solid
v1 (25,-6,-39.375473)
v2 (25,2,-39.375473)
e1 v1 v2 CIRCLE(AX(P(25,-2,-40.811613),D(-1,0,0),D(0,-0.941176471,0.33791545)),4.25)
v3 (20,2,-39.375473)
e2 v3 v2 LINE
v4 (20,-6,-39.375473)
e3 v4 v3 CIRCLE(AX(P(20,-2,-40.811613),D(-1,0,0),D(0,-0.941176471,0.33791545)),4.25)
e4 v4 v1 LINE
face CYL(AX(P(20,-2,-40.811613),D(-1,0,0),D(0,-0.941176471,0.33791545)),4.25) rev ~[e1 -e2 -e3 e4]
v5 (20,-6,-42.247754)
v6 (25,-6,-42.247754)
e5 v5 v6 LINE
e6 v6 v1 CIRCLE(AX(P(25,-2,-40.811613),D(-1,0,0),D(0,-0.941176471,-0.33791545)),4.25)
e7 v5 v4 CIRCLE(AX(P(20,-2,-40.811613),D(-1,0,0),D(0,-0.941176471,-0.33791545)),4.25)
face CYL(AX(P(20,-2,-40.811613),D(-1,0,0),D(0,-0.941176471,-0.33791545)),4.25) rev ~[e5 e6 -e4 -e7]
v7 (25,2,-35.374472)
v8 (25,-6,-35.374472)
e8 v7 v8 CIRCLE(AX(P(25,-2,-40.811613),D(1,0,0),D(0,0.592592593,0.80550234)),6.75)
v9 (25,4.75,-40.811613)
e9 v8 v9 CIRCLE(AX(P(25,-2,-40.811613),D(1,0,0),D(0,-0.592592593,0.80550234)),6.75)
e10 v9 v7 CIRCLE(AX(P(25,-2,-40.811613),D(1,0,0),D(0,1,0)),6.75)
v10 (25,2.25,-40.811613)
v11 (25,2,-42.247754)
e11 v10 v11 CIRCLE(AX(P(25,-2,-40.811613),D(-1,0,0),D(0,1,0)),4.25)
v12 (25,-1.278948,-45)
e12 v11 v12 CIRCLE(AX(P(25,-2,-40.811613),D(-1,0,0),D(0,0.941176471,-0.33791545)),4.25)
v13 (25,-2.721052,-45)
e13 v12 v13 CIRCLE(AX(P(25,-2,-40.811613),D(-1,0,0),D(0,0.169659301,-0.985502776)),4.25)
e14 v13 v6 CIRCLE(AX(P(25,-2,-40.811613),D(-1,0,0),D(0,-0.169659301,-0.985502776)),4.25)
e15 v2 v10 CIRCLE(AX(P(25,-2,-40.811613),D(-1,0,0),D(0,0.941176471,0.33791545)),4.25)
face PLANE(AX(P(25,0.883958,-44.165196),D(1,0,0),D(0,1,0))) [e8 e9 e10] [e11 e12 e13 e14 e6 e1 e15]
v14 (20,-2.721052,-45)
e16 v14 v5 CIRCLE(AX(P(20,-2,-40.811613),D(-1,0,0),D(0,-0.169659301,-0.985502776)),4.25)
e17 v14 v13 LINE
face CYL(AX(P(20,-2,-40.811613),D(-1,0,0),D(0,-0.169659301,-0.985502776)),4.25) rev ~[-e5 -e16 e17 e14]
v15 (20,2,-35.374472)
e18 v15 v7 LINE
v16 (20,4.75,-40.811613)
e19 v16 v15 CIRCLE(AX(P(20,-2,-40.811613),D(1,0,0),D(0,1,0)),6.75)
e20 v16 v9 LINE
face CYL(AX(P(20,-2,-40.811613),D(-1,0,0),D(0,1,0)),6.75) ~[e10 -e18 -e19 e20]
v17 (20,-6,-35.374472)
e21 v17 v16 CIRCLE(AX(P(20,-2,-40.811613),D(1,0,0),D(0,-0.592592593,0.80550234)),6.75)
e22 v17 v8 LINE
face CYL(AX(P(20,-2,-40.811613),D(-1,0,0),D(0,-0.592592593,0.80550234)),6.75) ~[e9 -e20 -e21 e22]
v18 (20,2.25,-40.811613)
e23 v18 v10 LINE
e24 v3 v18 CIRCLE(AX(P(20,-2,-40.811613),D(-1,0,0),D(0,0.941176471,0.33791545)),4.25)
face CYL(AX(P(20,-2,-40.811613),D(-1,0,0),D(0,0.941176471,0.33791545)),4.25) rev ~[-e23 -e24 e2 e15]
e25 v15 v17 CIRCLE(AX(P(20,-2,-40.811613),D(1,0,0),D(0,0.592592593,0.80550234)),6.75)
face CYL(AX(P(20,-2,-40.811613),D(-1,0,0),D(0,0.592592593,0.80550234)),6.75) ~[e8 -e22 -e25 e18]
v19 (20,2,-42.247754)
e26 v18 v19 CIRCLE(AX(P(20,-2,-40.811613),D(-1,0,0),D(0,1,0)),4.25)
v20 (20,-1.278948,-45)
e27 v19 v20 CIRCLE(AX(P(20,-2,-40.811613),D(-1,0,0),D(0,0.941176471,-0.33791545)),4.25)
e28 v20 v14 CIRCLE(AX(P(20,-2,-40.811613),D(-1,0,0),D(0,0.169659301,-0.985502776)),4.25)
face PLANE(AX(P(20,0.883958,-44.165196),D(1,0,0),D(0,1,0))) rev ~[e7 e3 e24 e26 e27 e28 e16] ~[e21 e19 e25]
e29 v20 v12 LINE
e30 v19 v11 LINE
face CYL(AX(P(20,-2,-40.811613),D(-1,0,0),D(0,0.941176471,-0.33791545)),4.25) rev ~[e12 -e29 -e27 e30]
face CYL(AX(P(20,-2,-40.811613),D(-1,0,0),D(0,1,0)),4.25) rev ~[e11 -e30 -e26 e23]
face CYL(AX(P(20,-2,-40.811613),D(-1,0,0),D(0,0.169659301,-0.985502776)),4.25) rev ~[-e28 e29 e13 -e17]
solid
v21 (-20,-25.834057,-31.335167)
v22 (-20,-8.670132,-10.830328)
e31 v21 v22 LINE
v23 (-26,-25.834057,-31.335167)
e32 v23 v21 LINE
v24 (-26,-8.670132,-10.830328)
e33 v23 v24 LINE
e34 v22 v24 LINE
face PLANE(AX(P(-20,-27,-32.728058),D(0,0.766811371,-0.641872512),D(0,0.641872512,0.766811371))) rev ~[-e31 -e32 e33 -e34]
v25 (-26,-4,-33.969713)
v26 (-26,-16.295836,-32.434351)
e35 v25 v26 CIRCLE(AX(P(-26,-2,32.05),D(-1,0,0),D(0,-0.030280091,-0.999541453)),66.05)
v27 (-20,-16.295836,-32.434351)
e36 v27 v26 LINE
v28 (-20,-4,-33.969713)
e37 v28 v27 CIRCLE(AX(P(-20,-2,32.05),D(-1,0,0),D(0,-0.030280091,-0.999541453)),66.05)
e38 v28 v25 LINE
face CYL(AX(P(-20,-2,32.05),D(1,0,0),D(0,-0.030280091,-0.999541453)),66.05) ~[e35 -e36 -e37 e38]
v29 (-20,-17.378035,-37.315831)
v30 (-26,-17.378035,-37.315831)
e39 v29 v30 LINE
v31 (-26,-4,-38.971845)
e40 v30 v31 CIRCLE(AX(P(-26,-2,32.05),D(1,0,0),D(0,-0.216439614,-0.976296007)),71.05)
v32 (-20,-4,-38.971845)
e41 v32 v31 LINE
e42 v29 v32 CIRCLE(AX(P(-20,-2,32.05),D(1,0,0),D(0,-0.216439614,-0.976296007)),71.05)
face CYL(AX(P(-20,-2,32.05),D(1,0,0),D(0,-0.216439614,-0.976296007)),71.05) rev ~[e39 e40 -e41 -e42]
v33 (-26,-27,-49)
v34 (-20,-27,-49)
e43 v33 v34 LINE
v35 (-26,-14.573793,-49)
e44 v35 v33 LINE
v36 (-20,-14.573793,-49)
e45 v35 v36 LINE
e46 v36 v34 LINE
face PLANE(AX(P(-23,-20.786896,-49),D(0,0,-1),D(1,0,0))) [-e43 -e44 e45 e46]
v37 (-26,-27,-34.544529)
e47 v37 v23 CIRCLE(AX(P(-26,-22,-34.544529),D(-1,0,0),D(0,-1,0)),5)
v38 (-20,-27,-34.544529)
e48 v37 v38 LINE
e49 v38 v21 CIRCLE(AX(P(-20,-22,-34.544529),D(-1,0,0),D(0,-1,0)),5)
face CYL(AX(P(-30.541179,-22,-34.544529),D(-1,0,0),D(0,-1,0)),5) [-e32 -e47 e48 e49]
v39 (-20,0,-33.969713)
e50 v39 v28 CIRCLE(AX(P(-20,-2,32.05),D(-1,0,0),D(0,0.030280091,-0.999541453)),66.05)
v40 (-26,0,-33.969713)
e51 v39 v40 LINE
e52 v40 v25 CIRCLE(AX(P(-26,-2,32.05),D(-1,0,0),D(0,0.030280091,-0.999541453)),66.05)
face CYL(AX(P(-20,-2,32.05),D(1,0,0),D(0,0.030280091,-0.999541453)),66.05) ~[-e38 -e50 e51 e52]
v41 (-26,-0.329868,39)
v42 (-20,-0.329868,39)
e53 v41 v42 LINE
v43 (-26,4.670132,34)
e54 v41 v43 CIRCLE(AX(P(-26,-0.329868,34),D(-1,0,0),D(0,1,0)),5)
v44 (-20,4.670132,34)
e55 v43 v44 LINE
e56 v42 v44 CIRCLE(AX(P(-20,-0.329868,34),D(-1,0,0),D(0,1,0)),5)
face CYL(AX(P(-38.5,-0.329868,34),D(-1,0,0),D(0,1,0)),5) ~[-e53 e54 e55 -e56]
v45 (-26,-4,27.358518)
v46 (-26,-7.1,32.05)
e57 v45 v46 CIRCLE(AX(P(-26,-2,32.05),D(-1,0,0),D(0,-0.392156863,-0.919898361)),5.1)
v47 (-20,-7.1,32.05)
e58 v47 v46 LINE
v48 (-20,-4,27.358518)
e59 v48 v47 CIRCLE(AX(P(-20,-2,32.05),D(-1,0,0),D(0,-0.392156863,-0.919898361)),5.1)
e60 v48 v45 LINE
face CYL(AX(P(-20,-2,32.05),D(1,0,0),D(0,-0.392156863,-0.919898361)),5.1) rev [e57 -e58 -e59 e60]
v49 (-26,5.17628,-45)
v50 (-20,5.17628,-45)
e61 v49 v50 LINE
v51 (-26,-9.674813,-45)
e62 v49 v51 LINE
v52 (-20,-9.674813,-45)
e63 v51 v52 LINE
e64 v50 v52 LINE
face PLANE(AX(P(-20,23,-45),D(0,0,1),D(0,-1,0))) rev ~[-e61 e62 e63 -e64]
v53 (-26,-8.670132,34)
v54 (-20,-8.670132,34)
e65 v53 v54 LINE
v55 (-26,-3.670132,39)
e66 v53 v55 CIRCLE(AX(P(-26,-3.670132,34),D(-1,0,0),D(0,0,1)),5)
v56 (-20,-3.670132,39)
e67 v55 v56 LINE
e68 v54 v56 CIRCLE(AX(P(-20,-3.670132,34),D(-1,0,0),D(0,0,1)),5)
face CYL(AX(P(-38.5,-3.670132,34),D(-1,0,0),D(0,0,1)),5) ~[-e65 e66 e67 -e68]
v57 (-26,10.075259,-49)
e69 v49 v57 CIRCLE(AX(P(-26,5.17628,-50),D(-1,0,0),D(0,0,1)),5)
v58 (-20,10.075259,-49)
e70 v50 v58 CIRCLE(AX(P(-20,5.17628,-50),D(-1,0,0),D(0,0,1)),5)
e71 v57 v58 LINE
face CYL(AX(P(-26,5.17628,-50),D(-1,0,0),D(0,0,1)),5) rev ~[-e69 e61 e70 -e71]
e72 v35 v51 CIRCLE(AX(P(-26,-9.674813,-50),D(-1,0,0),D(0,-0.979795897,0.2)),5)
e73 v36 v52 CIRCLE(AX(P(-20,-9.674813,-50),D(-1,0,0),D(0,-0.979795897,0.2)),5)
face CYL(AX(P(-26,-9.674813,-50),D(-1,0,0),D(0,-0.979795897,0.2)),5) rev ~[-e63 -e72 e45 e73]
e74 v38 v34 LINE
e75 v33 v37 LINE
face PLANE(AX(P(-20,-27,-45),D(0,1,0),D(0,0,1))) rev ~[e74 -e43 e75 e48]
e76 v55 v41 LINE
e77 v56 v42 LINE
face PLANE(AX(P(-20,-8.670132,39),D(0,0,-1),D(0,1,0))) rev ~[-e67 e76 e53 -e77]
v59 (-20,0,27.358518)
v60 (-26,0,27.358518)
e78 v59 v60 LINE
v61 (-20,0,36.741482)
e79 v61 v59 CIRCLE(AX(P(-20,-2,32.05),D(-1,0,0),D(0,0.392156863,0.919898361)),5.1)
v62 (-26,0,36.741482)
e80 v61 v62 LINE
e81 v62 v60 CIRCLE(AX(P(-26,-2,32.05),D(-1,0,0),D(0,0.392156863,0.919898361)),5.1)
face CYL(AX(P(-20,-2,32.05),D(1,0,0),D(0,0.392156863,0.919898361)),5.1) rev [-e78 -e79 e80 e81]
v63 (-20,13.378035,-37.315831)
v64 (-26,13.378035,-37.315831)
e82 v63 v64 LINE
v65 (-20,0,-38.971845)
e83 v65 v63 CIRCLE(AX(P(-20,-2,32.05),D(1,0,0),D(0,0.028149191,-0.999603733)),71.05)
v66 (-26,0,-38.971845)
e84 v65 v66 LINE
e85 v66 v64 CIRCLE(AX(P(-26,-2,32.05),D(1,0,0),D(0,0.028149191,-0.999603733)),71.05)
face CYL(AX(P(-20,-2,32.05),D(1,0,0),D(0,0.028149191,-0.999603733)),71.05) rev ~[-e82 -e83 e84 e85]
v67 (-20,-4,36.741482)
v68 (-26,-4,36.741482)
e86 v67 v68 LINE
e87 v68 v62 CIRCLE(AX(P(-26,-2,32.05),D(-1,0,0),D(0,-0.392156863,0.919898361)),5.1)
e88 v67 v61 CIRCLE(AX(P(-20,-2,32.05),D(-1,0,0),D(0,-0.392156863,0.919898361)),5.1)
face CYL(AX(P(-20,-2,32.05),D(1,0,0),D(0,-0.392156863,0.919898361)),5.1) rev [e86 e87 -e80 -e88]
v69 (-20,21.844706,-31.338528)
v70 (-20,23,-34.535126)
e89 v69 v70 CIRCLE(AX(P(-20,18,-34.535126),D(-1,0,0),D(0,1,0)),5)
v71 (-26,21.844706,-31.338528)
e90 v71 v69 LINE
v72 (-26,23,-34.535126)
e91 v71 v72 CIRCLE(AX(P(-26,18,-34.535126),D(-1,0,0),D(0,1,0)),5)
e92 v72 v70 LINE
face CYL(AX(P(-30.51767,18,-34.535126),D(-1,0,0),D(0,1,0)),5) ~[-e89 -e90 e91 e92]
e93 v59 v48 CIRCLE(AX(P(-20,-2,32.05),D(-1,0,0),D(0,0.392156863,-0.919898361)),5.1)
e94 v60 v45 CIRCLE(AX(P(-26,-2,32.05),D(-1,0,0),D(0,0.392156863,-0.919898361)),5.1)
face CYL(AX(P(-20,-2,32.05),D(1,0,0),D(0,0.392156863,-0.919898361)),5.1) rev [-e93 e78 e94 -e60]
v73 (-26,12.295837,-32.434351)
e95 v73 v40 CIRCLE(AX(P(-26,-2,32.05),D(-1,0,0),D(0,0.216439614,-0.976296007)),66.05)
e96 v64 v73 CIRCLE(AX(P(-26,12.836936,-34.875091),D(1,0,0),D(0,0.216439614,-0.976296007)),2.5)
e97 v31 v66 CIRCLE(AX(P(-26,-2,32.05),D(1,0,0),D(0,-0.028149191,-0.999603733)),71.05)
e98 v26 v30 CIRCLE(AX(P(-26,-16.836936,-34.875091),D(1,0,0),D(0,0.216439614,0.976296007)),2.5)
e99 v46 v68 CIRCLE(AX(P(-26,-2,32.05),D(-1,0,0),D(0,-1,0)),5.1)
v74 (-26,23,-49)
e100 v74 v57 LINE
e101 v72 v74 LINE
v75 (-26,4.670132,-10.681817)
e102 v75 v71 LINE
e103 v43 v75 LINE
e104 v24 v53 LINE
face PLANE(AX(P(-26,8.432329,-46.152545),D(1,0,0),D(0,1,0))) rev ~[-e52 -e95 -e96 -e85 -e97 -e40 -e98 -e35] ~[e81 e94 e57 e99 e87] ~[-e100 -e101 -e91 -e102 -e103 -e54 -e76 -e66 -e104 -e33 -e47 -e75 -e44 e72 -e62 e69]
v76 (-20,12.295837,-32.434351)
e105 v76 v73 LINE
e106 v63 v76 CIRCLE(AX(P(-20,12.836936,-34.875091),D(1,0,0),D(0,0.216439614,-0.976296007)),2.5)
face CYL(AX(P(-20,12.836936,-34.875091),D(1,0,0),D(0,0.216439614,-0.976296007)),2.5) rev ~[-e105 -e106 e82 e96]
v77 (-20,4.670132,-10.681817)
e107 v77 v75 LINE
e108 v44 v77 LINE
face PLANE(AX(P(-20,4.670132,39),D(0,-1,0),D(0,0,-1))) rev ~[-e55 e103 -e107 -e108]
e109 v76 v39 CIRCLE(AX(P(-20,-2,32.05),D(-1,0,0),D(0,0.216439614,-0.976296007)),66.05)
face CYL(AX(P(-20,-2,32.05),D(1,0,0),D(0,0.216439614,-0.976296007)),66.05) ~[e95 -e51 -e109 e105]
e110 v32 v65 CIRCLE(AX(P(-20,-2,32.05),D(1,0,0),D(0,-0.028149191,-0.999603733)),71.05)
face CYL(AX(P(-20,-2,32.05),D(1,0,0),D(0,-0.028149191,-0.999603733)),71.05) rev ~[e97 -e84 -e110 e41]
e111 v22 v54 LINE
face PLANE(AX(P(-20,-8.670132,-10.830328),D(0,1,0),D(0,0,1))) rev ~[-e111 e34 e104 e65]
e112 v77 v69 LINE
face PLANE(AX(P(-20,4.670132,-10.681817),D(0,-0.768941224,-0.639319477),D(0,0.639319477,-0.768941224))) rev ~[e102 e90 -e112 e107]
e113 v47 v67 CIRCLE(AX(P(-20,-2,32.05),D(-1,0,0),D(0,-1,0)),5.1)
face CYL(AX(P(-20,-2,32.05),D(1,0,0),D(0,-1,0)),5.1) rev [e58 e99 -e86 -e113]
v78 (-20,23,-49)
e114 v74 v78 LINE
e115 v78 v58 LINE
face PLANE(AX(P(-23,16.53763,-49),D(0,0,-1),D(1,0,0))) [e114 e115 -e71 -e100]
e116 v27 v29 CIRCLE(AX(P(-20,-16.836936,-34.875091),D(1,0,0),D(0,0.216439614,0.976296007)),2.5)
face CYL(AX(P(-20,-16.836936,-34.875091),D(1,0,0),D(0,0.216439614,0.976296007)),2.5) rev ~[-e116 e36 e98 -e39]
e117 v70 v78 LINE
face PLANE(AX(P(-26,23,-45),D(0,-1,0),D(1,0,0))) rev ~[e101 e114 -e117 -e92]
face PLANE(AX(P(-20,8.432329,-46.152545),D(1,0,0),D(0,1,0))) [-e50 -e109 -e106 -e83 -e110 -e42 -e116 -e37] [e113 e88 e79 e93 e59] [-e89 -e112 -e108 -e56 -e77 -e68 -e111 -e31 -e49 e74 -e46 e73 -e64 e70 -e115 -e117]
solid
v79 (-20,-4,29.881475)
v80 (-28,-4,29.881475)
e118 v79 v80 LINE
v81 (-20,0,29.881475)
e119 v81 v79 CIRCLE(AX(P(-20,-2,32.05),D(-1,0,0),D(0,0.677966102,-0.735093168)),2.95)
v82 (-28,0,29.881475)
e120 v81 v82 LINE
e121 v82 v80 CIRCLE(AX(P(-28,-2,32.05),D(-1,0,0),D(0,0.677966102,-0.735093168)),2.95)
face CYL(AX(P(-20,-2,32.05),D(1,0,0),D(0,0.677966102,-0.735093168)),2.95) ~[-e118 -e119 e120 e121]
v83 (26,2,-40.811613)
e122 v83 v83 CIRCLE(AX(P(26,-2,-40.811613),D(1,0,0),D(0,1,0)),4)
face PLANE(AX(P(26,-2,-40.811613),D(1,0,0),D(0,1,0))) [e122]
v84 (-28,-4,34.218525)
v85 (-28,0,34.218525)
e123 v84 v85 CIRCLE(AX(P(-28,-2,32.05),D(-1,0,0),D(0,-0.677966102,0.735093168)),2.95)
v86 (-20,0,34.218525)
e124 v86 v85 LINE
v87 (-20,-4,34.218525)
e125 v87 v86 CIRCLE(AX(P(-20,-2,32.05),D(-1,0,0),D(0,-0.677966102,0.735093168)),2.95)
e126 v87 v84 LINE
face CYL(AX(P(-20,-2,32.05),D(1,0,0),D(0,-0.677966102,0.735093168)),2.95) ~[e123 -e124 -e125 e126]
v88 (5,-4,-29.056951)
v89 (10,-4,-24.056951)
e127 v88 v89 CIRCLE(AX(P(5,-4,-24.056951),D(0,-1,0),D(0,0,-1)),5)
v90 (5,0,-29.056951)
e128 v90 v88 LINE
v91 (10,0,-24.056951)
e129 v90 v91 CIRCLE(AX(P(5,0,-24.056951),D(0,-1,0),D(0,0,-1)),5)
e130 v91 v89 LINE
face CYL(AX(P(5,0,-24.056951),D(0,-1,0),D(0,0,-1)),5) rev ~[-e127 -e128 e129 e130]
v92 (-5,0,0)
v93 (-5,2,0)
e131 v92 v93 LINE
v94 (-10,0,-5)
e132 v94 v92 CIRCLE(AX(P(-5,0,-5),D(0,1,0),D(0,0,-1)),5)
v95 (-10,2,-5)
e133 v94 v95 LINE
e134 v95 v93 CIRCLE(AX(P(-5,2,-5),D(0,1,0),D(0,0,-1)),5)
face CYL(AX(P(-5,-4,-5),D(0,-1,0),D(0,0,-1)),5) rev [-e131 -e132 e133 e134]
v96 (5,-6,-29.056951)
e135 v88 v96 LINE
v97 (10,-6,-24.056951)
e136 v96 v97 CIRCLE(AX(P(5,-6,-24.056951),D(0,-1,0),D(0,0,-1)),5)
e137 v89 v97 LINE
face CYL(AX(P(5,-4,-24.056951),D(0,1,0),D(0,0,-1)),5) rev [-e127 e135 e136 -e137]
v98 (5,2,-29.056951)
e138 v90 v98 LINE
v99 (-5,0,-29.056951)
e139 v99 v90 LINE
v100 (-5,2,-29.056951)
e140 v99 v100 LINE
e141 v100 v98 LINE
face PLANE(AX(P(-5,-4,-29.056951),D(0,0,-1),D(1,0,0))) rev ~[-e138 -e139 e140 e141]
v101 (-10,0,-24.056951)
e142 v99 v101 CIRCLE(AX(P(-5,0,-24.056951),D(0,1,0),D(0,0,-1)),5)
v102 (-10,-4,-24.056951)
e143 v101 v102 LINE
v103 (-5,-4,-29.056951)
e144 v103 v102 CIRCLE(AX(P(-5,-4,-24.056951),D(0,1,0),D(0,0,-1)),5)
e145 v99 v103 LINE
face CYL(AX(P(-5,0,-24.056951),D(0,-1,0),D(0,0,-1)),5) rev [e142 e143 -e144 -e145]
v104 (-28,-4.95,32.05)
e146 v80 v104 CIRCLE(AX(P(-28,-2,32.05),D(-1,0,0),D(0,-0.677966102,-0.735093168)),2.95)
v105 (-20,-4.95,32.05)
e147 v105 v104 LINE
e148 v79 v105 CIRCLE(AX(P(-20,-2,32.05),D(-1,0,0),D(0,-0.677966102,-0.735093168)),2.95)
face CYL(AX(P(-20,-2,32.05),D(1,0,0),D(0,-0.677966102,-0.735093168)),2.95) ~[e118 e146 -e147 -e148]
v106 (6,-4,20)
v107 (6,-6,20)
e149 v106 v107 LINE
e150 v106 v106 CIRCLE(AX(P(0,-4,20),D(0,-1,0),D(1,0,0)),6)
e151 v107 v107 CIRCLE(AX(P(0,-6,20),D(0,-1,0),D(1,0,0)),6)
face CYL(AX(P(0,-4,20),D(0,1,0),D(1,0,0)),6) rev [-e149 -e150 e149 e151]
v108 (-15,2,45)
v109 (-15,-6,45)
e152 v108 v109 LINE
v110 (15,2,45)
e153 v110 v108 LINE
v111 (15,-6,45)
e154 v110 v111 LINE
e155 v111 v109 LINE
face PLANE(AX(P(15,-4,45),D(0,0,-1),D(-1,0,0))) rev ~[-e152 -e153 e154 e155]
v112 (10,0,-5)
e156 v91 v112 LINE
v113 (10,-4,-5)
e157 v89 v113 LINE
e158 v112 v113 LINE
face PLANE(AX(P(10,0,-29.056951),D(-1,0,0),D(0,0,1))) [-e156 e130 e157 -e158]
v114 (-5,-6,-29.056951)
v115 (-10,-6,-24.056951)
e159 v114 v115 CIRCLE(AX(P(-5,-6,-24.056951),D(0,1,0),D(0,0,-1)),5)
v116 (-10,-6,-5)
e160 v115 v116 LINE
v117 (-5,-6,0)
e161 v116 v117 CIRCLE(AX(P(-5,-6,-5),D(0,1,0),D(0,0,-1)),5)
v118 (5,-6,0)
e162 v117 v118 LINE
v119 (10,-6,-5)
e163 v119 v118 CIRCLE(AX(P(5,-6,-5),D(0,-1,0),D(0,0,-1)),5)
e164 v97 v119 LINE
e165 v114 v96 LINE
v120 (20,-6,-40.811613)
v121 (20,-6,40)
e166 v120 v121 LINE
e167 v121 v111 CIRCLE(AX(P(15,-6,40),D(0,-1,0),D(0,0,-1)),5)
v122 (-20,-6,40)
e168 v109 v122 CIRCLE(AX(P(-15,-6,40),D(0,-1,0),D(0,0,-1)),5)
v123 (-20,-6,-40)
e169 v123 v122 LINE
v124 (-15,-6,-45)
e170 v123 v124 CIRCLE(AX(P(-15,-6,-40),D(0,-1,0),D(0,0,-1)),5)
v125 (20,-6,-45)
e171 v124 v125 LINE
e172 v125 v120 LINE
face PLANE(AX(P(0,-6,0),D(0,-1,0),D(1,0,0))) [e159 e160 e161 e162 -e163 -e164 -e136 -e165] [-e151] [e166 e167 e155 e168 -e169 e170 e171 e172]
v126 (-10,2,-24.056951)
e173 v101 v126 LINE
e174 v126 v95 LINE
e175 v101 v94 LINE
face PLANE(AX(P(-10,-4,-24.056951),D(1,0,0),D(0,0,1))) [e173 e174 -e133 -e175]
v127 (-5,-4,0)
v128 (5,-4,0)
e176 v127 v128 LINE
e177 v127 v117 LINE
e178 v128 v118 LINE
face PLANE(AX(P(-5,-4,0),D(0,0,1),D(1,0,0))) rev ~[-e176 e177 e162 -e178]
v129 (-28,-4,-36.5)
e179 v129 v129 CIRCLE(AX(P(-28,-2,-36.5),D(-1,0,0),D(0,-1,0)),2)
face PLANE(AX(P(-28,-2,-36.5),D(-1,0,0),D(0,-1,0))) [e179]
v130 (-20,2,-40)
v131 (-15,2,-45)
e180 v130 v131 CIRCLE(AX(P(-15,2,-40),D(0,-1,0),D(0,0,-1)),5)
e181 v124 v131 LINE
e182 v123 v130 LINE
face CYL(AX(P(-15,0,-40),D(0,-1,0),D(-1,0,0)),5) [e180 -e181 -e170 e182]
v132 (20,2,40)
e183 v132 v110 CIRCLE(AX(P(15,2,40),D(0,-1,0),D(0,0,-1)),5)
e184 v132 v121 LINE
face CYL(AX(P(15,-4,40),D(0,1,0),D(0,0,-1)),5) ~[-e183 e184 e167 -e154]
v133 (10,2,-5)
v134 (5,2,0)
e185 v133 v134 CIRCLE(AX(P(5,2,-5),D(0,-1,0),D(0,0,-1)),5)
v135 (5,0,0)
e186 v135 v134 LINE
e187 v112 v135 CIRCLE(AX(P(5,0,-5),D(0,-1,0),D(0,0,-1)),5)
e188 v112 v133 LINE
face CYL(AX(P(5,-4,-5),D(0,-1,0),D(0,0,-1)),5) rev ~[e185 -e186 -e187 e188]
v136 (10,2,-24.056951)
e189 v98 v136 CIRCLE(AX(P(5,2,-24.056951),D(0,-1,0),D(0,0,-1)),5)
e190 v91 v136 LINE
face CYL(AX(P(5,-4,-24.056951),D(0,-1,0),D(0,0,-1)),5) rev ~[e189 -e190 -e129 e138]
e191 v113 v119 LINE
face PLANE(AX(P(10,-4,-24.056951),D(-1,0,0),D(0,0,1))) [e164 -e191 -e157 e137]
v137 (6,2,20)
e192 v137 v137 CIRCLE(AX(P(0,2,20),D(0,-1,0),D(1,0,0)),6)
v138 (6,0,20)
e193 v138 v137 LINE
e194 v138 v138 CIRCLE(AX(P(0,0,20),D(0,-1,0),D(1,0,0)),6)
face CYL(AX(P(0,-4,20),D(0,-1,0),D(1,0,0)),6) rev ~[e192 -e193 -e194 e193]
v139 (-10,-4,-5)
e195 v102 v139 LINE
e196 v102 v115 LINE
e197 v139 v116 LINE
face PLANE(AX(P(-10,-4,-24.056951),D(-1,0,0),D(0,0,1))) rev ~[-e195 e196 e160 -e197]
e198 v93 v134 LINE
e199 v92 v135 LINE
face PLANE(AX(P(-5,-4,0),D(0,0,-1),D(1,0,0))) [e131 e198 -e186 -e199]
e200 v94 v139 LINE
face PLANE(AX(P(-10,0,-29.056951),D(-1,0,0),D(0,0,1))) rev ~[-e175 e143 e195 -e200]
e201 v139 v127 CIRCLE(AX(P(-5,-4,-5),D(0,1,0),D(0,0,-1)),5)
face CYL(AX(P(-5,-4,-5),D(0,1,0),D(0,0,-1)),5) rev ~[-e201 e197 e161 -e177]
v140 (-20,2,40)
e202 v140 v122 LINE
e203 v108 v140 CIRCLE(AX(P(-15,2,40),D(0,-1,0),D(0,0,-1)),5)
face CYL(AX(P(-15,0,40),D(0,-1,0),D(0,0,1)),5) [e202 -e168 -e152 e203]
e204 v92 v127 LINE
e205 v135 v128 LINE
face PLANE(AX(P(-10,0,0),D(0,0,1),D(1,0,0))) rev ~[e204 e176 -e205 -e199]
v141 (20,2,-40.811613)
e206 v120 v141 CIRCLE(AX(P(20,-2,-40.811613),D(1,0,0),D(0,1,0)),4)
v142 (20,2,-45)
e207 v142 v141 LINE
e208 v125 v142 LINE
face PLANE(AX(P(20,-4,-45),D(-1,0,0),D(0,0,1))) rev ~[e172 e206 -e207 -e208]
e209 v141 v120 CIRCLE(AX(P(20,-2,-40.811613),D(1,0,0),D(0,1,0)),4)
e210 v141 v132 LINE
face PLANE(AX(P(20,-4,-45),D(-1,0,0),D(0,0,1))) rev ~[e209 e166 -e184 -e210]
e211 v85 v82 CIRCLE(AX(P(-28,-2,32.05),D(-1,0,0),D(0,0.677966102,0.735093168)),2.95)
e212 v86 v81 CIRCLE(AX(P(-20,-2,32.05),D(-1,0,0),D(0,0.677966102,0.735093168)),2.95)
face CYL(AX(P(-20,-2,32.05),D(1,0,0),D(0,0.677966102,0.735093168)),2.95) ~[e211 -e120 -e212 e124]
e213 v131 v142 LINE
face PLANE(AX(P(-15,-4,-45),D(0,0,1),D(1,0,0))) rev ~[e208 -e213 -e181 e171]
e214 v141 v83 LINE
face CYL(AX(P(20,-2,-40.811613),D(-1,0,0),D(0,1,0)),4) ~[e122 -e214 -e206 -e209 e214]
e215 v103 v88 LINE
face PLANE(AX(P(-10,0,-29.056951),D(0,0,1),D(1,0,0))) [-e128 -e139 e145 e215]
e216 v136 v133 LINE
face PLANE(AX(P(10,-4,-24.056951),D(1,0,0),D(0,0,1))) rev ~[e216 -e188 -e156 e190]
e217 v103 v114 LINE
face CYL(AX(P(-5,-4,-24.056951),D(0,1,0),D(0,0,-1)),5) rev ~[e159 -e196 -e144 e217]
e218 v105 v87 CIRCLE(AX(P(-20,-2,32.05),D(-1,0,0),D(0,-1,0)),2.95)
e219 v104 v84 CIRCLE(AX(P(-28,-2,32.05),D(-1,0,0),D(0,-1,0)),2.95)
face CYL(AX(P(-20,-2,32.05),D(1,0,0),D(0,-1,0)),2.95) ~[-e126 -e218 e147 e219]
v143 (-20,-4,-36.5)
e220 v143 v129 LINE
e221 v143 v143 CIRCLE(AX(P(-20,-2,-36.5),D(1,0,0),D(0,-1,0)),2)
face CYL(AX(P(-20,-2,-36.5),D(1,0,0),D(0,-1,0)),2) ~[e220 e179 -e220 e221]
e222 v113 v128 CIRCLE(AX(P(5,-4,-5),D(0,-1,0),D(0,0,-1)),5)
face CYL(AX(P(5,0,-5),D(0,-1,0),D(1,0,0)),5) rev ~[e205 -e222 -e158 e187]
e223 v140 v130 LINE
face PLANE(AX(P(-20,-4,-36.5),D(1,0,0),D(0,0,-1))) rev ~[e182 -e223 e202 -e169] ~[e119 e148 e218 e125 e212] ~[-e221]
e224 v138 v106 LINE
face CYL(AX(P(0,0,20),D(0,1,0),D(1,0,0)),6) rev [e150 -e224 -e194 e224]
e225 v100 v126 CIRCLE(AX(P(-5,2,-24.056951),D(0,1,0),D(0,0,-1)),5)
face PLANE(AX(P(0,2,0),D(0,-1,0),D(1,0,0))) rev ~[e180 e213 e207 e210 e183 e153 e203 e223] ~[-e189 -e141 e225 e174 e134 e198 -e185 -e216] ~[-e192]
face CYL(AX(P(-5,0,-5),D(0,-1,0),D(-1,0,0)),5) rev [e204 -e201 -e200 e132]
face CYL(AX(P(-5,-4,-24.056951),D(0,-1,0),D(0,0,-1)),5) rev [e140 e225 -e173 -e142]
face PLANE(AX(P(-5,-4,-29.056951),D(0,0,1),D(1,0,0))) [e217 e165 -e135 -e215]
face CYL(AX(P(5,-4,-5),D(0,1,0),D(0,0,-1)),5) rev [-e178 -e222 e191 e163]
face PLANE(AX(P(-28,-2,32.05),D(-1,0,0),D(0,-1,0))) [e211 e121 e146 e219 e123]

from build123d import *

# Parameters (mm, degrees)
F0_W           = 20
F0_H           = 29.0569514036
F0_R           = 6
F1_DEPTH       = 4
F3_DEPTH       = 8
F4_DEPTH       = 6
F5_DEPTH       = 8
F6_W           = 6
F6_H           = 12.9247409806
F6_H_2         = 12.42620707
F7_DEPTH       = 4
F8_R           = 5
F9_DEPTH       = 6
F10_T1_DEPTH   = 6
F10_T3_DEPTH   = 6
F10_T5_DEPTH   = 15.0823576644
F10_T7_DEPTH   = 31
F10_T9_DEPTH   = 30.9999999981
F10_T11_DEPTH  = 15.0353408704
F11_DEPTH      = 2
F11_DEPTH_BACK = 6
F13_DEPTH      = 6
F14_DEPTH      = 5


# Not quite as in the source:
# - a fillet or chamfer that OpenCascade refuses, or shapes differently, is made with other operations: its cross-section is extruded or revolved along the edge and cut away or added


with BuildPart() as f1:
    # F0 (on Front) → F1 (new body)
    with BuildSketch(Plane.XZ):
        Polygon((20, -45), (20, 45), (-20, 45), (-20, -45), (-10, -45), (10, -45), align=None)
        with Locations((0, -14.5284757018)):
            Rectangle(F0_W, F0_H, mode=Mode.SUBTRACT)
        with Locations((0, 20)):
            Circle(F0_R, mode=Mode.SUBTRACT)
    extrude(amount=F1_DEPTH)

    # F2 (on face) → F3 (join)
    with BuildSketch(Plane(origin=(-20, 0, 0), x_dir=(0, -1, 0), z_dir=(-1, 0, 0))):
        with BuildLine():
            Line((4, 29.8814751558), (4, 34.2185248442))
            ThreePointArc((4, 34.2185248442), (2, 35), (0, 34.2185248442))
            Line((0, 34.2185248442), (0, 29.8814751558))
            ThreePointArc((0, 29.8814751558), (2, 29.1), (4, 29.8814751558))
        make_face()
        with BuildLine():
            ThreePointArc((4.95, 32.05), (4.7020825302, 33.2337440602), (4, 34.2185248442))
            Line((4, 34.2185248442), (4, 29.8814751558))
            ThreePointArc((4, 29.8814751558), (4.7020825302, 30.8662559398), (4.95, 32.05))
        make_face()
        with BuildLine():
            Line((0, 29.8814751558), (0, 34.2185248442))
            ThreePointArc((0, 34.2185248442), (-0.95, 32.05), (0, 29.8814751558))
        make_face()
    extrude(amount=F3_DEPTH)

    # F2 (on face) → F5 (join)
    with BuildSketch(Plane(origin=(-20, 0, 0), x_dir=(0, -1, 0), z_dir=(-1, 0, 0))):
        with BuildLine():
            ThreePointArc((0, -36.5), (1.9999999971, -38.4999999971), (3.9999999942, -36.5))
            ThreePointArc((3.9999999942, -36.5), (1.9999999971, -34.5000000029), (0, -36.5))
        make_face()
    extrude(amount=F5_DEPTH)

    # F8
    f8_edges = [f1.edges().sort_by_distance(p)[0] for p in [
        (-20, -2, -45),
        (-10, -2, 0),
        (-10, -2, -29.056951),
        (10, -2, 0),
        (20, -2, 45),
        (-20, -2, 45),
        (10, -2, -29.056951),
    ]]
    fillet(f8_edges, radius=F8_R)

    # F11 (add, two sides): a face of the model
    f11_faces = [f1.faces().sort_by_distance(p)[0] for p in [
        (0.0348005991, -4, 1.935297002),
    ]]
    extrude(f11_faces, amount=F11_DEPTH)
    extrude(f11_faces, amount=-F11_DEPTH_BACK)

    # F12 (on face) → F13 (join)
    with BuildSketch(Plane.YZ.offset(20)):
        with BuildLine():
            ThreePointArc((-6, -40.8116131475), (-2.0000000273, -44.8116132021), (2, -40.8116132021))
            ThreePointArc((2, -40.8116132021), (-1.9999999727, -36.8116132021), (-6, -40.8116131475))
        make_face()
    extrude(amount=F13_DEPTH)


with BuildPart() as f4:
    # F2 (on face) → F4 (new body)
    with BuildSketch(Plane(origin=(-20, 0, 0), x_dir=(0, -1, 0), z_dir=(-1, 0, 0))):
        with BuildLine():
            ThreePointArc((4, 27.3585183577), (6.2549970623, 29.2384168161), (7.1, 32.05))
            ThreePointArc((7.1, 32.05), (6.2549970623, 34.8615831839), (4, 36.7414816423))
            Line((4, 36.7414816423), (4, 34.2185248442))
            ThreePointArc((4, 34.2185248442), (4.7020825302, 33.2337440602), (4.95, 32.05))
            ThreePointArc((4.95, 32.05), (4.7020825302, 30.8662559398), (4, 29.8814751558))
            Line((4, 29.8814751558), (4, 27.3585183577))
        make_face()
        with BuildLine():
            ThreePointArc((4, 36.7414816423), (6.2549970623, 34.8615831839), (7.1, 32.05))
            ThreePointArc((7.1, 32.05), (6.2549970623, 29.2384168161), (4, 27.3585183577))
            Line((4, 27.3585183577), (4, -33.9697129651))
            ThreePointArc((4, -33.9697129651), (10.1840030349, -33.4910145964), (16.2958364979, -32.4343512709))
            ThreePointArc((16.2958364979, -32.4343512709), (19.2776755505, -34.333992254), (17.3780345674, -37.3158313065))
            ThreePointArc((17.3780345674, -37.3158313065), (10.7283799691, -38.4618279661), (4, -38.9718452309))
            Line((4, -38.9718452309), (4, -45))
            Line((4, -45), (26.999999997, -45))
            Line((26.999999997, -45), (26.999999997, -32.7280576398))
            Line((26.999999997, -32.7280576398), (8.6701322833, -10.8303275913))
            Line((8.6701322833, -10.8303275913), (8.6701322833, 39))
            Line((8.6701322833, 39), (4, 39))
            Line((4, 39), (4, 36.7414816423))
        make_face()
        with BuildLine():
            Line((4, 34.2185248442), (4, 36.7414816423))
            ThreePointArc((4, 36.7414816423), (2, 37.15), (0, 36.7414816423))
            Line((0, 36.7414816423), (0, 34.2185248442))
            ThreePointArc((0, 34.2185248442), (2, 35), (4, 34.2185248442))
        make_face()
        with BuildLine():
            ThreePointArc((0, 36.7414816423), (2, 37.15), (4, 36.7414816423))
            Line((4, 36.7414816423), (4, 39))
            Line((4, 39), (0, 39))
            Line((0, 39), (0, 36.7414816423))
        make_face()
        with BuildLine():
            Line((4, -33.9697129651), (4, 27.3585183577))
            ThreePointArc((4, 27.3585183577), (2, 26.95), (0, 27.3585183577))
            Line((0, 27.3585183577), (0, -33.9697129651))
            ThreePointArc((0, -33.9697129651), (2, -34), (4, -33.9697129651))
        make_face()
        with BuildLine():
            ThreePointArc((0, 27.3585183577), (2, 26.95), (4, 27.3585183577))
            Line((4, 27.3585183577), (4, 29.8814751558))
            ThreePointArc((4, 29.8814751558), (2, 29.1), (0, 29.8814751558))
            Line((0, 29.8814751558), (0, 27.3585183577))
        make_face()
        with BuildLine():
            Line((0, 34.2185248442), (0, 36.7414816423))
            ThreePointArc((0, 36.7414816423), (-3.1, 32.05), (0, 27.3585183577))
            Line((0, 27.3585183577), (0, 29.8814751558))
            ThreePointArc((0, 29.8814751558), (-0.95, 32.05), (0, 34.2185248442))
        make_face()
        with BuildLine():
            ThreePointArc((0, 27.3585183577), (-3.1, 32.05), (0, 36.7414816423))
            Line((0, 36.7414816423), (0, 39))
            Line((0, 39), (-4.6701322773, 39))
            Line((-4.6701322773, 39), (-4.6701322811, -10.6818171995))
            Line((-4.6701322811, -10.6818171995), (-23.000000003, -32.7280576398))
            Line((-23.000000003, -32.7280576398), (-23.000000003, -45))
            Line((-23.000000003, -45), (0, -45))
            Line((0, -45), (0, -38.9718452309))
            ThreePointArc((0, -38.9718452309), (-6.7283799721, -38.4618279657), (-13.3780345732, -37.3158313052))
            ThreePointArc((-13.3780345732, -37.3158313052), (-15.2776755561, -34.3339922525), (-12.2958365033, -32.4343512697))
            ThreePointArc((-12.2958365033, -32.4343512697), (-6.1840030376, -33.4910145961), (0, -33.9697129651))
            Line((0, -33.9697129651), (0, 27.3585183577))
        make_face()
        with BuildLine():
            Line((4, -45), (4, -38.9718452309))
            ThreePointArc((4, -38.9718452309), (2, -39), (0, -38.9718452309))
            Line((0, -38.9718452309), (0, -45))
            Line((0, -45), (4, -45))
        make_face()
    extrude(amount=F4_DEPTH)

    # F6 (on face) → F7 (join)
    with BuildSketch(Plane(origin=(0, 0, -45), x_dir=(1, 0, 0), z_dir=(0, 0, -1))):
        with Locations((-23, -16.5376295127)):
            Rectangle(F6_W, F6_H)
        with Locations((-23, 20.786896462)):
            Rectangle(F6_W, F6_H_2)
    extrude(amount=F7_DEPTH)

    # F2 (on face) → F9 (cut, through all)
    with BuildSketch(Plane(origin=(-20, 0, 0), x_dir=(0, -1, 0), z_dir=(-1, 0, 0))):
        with BuildLine():
            Line((4, 34.2185248442), (4, 36.7414816423))
            ThreePointArc((4, 36.7414816423), (2, 37.15), (0, 36.7414816423))
            Line((0, 36.7414816423), (0, 34.2185248442))
            ThreePointArc((0, 34.2185248442), (2, 35), (4, 34.2185248442))
        make_face()
        with BuildLine():
            Line((0, 34.2185248442), (0, 36.7414816423))
            ThreePointArc((0, 36.7414816423), (-3.1, 32.05), (0, 27.3585183577))
            Line((0, 27.3585183577), (0, 29.8814751558))
            ThreePointArc((0, 29.8814751558), (-0.95, 32.05), (0, 34.2185248442))
        make_face()
        with BuildLine():
            ThreePointArc((0, 27.3585183577), (2, 26.95), (4, 27.3585183577))
            Line((4, 27.3585183577), (4, 29.8814751558))
            ThreePointArc((4, 29.8814751558), (2, 29.1), (0, 29.8814751558))
            Line((0, 29.8814751558), (0, 27.3585183577))
        make_face()
        with BuildLine():
            ThreePointArc((4, 27.3585183577), (6.2549970623, 29.2384168161), (7.1, 32.05))
            ThreePointArc((7.1, 32.05), (6.2549970623, 34.8615831839), (4, 36.7414816423))
            Line((4, 36.7414816423), (4, 34.2185248442))
            ThreePointArc((4, 34.2185248442), (4.7020825302, 33.2337440602), (4.95, 32.05))
            ThreePointArc((4.95, 32.05), (4.7020825302, 30.8662559398), (4, 29.8814751558))
            Line((4, 29.8814751558), (4, 27.3585183577))
        make_face()
    extrude(amount=F9_DEPTH, mode=Mode.SUBTRACT)

    # F10: fillet of radius 5 on 6 edges, made by hand

    # F10_s2 → F10_t1 (join)
    with BuildSketch(Plane.YZ.offset(-26)):
        with BuildLine():
            ThreePointArc((-14.573792927, -49), (-12.8370911016, -46.1270166538), (-9.6748134414, -45))
            Line((-9.6748134414, -45), (-14.573792927, -45))
            Line((-14.573792927, -45), (-14.573792927, -49))
        make_face()
    extrude(amount=F10_T1_DEPTH)

    # F10_s4 → F10_t3 (join)
    with BuildSketch(Plane.YZ.offset(-26)):
        with BuildLine():
            ThreePointArc((5.1762795368, -45), (8.338557197, -46.1270166538), (10.0752590224, -49))
            Line((10.0752590224, -49), (10.0752590224, -45))
            Line((10.0752590224, -45), (5.1762795368, -45))
        make_face()
    extrude(amount=F10_T3_DEPTH)

    # F10_s6 → F10_t5 (cut)
    with BuildSketch(Plane.YZ.offset(-30.5411788322)):
        with BuildLine():
            ThreePointArc((-26.999999997, -34.5445291727), (-26.6994831746, -32.8372336905), (-25.8340568515, -31.3351666135))
            Line((-25.8340568515, -31.3351666135), (-26.999999997, -32.7280576398))
            Line((-26.999999997, -32.7280576398), (-26.999999997, -34.5445291727))
        make_face()
    extrude(amount=F10_T5_DEPTH, mode=Mode.SUBTRACT)

    # F10_s8 → F10_t7 (cut)
    with BuildSketch(Plane.YZ.offset(-38.5)):
        with BuildLine():
            ThreePointArc((-3.6701322833, 39), (-7.2056661892, 37.5355339059), (-8.6701322833, 34))
            Line((-8.6701322833, 34), (-8.6701322833, 39))
            Line((-8.6701322833, 39), (-3.6701322833, 39))
        make_face()
    extrude(amount=F10_T7_DEPTH, mode=Mode.SUBTRACT)

    # F10_s10 → F10_t9 (cut)
    with BuildSketch(Plane.YZ.offset(-38.499999999)):
        with BuildLine():
            ThreePointArc((4.6701322777, 34.0000000004), (3.2056661835, 37.5355339061), (-0.3298677223, 39))
            Line((-0.3298677223, 39), (4.6701322773, 39))
            Line((4.6701322773, 39), (4.6701322777, 34.0000000004))
        make_face()
    extrude(amount=F10_T9_DEPTH, mode=Mode.SUBTRACT)

    # F10_s12 → F10_t11 (cut)
    with BuildSketch(Plane.YZ.offset(-30.5176704352)):
        with BuildLine():
            ThreePointArc((23.000000003, -34.5351258139), (22.7023148902, -32.8356450985), (21.8447061222, -31.3385284265))
            Line((21.8447061222, -31.3385284265), (23.000000003, -32.7280576398))
            Line((23.000000003, -32.7280576398), (23.000000003, -34.5351258139))
        make_face()
    extrude(amount=F10_T11_DEPTH, mode=Mode.SUBTRACT)


with BuildPart() as f14:
    # F12 (on face) → F14 (new body)
    with BuildSketch(Plane.YZ.offset(20)):
        with BuildLine():
            Line((2, -45), (2, -42.2477538637))
            ThreePointArc((2, -42.2477538637), (0.7323612075, -44.0668708312), (-1.2789479692, -45))
            Line((-1.2789479692, -45), (0, -45))
            Line((0, -45), (2, -45))
        make_face()
        with BuildLine():
            ThreePointArc((2.25, -40.8116132021), (2.1870335561, -41.540482189), (2, -42.2477538637))
            Line((2, -42.2477538637), (2, -45))
            Line((2, -45), (0, -45))
            Line((0, -45), (-1.2789479692, -45))
            ThreePointArc((-1.2789479692, -45), (-2, -45.0616132021), (-2.7210520308, -45))
            Line((-2.7210520308, -45), (-4, -45))
            Line((-4, -45), (-6, -45))
            Line((-6, -45), (-6, -42.2477538637))
            ThreePointArc((-6, -42.2477538637), (-6.25, -40.8116132021), (-6, -39.3754725405))
            Line((-6, -39.3754725405), (-6, -35.3744724094))
            ThreePointArc((-6, -35.3744724094), (-5.0465144017, -46.8350051037), (4.75, -40.8116132021))
            ThreePointArc((4.75, -40.8116132021), (4.0233919016, -37.7650988004), (2, -35.3744724094))
            Line((2, -35.3744724094), (2, -39.3754725405))
            ThreePointArc((2, -39.3754725405), (2.1870335561, -40.0827442152), (2.25, -40.8116132021))
        make_face()
        with BuildLine():
            ThreePointArc((-6, -39.3754725405), (-2, -36.5616132021), (2, -39.3754725405))
            Line((2, -39.3754725405), (2, -35.3744724094))
            ThreePointArc((2, -35.3744724094), (-2, -34.0616132021), (-6, -35.3744724094))
            Line((-6, -35.3744724094), (-6, -39.3754725405))
        make_face()
        with BuildLine():
            ThreePointArc((-2.7210520308, -45), (-4.7323612075, -44.0668708312), (-6, -42.2477538637))
            Line((-6, -42.2477538637), (-6, -45))
            Line((-6, -45), (-4, -45))
            Line((-4, -45), (-2.7210520308, -45))
        make_face()
    extrude(amount=F14_DEPTH)


solid = Compound([f1.part, f4.part, f14.part])
